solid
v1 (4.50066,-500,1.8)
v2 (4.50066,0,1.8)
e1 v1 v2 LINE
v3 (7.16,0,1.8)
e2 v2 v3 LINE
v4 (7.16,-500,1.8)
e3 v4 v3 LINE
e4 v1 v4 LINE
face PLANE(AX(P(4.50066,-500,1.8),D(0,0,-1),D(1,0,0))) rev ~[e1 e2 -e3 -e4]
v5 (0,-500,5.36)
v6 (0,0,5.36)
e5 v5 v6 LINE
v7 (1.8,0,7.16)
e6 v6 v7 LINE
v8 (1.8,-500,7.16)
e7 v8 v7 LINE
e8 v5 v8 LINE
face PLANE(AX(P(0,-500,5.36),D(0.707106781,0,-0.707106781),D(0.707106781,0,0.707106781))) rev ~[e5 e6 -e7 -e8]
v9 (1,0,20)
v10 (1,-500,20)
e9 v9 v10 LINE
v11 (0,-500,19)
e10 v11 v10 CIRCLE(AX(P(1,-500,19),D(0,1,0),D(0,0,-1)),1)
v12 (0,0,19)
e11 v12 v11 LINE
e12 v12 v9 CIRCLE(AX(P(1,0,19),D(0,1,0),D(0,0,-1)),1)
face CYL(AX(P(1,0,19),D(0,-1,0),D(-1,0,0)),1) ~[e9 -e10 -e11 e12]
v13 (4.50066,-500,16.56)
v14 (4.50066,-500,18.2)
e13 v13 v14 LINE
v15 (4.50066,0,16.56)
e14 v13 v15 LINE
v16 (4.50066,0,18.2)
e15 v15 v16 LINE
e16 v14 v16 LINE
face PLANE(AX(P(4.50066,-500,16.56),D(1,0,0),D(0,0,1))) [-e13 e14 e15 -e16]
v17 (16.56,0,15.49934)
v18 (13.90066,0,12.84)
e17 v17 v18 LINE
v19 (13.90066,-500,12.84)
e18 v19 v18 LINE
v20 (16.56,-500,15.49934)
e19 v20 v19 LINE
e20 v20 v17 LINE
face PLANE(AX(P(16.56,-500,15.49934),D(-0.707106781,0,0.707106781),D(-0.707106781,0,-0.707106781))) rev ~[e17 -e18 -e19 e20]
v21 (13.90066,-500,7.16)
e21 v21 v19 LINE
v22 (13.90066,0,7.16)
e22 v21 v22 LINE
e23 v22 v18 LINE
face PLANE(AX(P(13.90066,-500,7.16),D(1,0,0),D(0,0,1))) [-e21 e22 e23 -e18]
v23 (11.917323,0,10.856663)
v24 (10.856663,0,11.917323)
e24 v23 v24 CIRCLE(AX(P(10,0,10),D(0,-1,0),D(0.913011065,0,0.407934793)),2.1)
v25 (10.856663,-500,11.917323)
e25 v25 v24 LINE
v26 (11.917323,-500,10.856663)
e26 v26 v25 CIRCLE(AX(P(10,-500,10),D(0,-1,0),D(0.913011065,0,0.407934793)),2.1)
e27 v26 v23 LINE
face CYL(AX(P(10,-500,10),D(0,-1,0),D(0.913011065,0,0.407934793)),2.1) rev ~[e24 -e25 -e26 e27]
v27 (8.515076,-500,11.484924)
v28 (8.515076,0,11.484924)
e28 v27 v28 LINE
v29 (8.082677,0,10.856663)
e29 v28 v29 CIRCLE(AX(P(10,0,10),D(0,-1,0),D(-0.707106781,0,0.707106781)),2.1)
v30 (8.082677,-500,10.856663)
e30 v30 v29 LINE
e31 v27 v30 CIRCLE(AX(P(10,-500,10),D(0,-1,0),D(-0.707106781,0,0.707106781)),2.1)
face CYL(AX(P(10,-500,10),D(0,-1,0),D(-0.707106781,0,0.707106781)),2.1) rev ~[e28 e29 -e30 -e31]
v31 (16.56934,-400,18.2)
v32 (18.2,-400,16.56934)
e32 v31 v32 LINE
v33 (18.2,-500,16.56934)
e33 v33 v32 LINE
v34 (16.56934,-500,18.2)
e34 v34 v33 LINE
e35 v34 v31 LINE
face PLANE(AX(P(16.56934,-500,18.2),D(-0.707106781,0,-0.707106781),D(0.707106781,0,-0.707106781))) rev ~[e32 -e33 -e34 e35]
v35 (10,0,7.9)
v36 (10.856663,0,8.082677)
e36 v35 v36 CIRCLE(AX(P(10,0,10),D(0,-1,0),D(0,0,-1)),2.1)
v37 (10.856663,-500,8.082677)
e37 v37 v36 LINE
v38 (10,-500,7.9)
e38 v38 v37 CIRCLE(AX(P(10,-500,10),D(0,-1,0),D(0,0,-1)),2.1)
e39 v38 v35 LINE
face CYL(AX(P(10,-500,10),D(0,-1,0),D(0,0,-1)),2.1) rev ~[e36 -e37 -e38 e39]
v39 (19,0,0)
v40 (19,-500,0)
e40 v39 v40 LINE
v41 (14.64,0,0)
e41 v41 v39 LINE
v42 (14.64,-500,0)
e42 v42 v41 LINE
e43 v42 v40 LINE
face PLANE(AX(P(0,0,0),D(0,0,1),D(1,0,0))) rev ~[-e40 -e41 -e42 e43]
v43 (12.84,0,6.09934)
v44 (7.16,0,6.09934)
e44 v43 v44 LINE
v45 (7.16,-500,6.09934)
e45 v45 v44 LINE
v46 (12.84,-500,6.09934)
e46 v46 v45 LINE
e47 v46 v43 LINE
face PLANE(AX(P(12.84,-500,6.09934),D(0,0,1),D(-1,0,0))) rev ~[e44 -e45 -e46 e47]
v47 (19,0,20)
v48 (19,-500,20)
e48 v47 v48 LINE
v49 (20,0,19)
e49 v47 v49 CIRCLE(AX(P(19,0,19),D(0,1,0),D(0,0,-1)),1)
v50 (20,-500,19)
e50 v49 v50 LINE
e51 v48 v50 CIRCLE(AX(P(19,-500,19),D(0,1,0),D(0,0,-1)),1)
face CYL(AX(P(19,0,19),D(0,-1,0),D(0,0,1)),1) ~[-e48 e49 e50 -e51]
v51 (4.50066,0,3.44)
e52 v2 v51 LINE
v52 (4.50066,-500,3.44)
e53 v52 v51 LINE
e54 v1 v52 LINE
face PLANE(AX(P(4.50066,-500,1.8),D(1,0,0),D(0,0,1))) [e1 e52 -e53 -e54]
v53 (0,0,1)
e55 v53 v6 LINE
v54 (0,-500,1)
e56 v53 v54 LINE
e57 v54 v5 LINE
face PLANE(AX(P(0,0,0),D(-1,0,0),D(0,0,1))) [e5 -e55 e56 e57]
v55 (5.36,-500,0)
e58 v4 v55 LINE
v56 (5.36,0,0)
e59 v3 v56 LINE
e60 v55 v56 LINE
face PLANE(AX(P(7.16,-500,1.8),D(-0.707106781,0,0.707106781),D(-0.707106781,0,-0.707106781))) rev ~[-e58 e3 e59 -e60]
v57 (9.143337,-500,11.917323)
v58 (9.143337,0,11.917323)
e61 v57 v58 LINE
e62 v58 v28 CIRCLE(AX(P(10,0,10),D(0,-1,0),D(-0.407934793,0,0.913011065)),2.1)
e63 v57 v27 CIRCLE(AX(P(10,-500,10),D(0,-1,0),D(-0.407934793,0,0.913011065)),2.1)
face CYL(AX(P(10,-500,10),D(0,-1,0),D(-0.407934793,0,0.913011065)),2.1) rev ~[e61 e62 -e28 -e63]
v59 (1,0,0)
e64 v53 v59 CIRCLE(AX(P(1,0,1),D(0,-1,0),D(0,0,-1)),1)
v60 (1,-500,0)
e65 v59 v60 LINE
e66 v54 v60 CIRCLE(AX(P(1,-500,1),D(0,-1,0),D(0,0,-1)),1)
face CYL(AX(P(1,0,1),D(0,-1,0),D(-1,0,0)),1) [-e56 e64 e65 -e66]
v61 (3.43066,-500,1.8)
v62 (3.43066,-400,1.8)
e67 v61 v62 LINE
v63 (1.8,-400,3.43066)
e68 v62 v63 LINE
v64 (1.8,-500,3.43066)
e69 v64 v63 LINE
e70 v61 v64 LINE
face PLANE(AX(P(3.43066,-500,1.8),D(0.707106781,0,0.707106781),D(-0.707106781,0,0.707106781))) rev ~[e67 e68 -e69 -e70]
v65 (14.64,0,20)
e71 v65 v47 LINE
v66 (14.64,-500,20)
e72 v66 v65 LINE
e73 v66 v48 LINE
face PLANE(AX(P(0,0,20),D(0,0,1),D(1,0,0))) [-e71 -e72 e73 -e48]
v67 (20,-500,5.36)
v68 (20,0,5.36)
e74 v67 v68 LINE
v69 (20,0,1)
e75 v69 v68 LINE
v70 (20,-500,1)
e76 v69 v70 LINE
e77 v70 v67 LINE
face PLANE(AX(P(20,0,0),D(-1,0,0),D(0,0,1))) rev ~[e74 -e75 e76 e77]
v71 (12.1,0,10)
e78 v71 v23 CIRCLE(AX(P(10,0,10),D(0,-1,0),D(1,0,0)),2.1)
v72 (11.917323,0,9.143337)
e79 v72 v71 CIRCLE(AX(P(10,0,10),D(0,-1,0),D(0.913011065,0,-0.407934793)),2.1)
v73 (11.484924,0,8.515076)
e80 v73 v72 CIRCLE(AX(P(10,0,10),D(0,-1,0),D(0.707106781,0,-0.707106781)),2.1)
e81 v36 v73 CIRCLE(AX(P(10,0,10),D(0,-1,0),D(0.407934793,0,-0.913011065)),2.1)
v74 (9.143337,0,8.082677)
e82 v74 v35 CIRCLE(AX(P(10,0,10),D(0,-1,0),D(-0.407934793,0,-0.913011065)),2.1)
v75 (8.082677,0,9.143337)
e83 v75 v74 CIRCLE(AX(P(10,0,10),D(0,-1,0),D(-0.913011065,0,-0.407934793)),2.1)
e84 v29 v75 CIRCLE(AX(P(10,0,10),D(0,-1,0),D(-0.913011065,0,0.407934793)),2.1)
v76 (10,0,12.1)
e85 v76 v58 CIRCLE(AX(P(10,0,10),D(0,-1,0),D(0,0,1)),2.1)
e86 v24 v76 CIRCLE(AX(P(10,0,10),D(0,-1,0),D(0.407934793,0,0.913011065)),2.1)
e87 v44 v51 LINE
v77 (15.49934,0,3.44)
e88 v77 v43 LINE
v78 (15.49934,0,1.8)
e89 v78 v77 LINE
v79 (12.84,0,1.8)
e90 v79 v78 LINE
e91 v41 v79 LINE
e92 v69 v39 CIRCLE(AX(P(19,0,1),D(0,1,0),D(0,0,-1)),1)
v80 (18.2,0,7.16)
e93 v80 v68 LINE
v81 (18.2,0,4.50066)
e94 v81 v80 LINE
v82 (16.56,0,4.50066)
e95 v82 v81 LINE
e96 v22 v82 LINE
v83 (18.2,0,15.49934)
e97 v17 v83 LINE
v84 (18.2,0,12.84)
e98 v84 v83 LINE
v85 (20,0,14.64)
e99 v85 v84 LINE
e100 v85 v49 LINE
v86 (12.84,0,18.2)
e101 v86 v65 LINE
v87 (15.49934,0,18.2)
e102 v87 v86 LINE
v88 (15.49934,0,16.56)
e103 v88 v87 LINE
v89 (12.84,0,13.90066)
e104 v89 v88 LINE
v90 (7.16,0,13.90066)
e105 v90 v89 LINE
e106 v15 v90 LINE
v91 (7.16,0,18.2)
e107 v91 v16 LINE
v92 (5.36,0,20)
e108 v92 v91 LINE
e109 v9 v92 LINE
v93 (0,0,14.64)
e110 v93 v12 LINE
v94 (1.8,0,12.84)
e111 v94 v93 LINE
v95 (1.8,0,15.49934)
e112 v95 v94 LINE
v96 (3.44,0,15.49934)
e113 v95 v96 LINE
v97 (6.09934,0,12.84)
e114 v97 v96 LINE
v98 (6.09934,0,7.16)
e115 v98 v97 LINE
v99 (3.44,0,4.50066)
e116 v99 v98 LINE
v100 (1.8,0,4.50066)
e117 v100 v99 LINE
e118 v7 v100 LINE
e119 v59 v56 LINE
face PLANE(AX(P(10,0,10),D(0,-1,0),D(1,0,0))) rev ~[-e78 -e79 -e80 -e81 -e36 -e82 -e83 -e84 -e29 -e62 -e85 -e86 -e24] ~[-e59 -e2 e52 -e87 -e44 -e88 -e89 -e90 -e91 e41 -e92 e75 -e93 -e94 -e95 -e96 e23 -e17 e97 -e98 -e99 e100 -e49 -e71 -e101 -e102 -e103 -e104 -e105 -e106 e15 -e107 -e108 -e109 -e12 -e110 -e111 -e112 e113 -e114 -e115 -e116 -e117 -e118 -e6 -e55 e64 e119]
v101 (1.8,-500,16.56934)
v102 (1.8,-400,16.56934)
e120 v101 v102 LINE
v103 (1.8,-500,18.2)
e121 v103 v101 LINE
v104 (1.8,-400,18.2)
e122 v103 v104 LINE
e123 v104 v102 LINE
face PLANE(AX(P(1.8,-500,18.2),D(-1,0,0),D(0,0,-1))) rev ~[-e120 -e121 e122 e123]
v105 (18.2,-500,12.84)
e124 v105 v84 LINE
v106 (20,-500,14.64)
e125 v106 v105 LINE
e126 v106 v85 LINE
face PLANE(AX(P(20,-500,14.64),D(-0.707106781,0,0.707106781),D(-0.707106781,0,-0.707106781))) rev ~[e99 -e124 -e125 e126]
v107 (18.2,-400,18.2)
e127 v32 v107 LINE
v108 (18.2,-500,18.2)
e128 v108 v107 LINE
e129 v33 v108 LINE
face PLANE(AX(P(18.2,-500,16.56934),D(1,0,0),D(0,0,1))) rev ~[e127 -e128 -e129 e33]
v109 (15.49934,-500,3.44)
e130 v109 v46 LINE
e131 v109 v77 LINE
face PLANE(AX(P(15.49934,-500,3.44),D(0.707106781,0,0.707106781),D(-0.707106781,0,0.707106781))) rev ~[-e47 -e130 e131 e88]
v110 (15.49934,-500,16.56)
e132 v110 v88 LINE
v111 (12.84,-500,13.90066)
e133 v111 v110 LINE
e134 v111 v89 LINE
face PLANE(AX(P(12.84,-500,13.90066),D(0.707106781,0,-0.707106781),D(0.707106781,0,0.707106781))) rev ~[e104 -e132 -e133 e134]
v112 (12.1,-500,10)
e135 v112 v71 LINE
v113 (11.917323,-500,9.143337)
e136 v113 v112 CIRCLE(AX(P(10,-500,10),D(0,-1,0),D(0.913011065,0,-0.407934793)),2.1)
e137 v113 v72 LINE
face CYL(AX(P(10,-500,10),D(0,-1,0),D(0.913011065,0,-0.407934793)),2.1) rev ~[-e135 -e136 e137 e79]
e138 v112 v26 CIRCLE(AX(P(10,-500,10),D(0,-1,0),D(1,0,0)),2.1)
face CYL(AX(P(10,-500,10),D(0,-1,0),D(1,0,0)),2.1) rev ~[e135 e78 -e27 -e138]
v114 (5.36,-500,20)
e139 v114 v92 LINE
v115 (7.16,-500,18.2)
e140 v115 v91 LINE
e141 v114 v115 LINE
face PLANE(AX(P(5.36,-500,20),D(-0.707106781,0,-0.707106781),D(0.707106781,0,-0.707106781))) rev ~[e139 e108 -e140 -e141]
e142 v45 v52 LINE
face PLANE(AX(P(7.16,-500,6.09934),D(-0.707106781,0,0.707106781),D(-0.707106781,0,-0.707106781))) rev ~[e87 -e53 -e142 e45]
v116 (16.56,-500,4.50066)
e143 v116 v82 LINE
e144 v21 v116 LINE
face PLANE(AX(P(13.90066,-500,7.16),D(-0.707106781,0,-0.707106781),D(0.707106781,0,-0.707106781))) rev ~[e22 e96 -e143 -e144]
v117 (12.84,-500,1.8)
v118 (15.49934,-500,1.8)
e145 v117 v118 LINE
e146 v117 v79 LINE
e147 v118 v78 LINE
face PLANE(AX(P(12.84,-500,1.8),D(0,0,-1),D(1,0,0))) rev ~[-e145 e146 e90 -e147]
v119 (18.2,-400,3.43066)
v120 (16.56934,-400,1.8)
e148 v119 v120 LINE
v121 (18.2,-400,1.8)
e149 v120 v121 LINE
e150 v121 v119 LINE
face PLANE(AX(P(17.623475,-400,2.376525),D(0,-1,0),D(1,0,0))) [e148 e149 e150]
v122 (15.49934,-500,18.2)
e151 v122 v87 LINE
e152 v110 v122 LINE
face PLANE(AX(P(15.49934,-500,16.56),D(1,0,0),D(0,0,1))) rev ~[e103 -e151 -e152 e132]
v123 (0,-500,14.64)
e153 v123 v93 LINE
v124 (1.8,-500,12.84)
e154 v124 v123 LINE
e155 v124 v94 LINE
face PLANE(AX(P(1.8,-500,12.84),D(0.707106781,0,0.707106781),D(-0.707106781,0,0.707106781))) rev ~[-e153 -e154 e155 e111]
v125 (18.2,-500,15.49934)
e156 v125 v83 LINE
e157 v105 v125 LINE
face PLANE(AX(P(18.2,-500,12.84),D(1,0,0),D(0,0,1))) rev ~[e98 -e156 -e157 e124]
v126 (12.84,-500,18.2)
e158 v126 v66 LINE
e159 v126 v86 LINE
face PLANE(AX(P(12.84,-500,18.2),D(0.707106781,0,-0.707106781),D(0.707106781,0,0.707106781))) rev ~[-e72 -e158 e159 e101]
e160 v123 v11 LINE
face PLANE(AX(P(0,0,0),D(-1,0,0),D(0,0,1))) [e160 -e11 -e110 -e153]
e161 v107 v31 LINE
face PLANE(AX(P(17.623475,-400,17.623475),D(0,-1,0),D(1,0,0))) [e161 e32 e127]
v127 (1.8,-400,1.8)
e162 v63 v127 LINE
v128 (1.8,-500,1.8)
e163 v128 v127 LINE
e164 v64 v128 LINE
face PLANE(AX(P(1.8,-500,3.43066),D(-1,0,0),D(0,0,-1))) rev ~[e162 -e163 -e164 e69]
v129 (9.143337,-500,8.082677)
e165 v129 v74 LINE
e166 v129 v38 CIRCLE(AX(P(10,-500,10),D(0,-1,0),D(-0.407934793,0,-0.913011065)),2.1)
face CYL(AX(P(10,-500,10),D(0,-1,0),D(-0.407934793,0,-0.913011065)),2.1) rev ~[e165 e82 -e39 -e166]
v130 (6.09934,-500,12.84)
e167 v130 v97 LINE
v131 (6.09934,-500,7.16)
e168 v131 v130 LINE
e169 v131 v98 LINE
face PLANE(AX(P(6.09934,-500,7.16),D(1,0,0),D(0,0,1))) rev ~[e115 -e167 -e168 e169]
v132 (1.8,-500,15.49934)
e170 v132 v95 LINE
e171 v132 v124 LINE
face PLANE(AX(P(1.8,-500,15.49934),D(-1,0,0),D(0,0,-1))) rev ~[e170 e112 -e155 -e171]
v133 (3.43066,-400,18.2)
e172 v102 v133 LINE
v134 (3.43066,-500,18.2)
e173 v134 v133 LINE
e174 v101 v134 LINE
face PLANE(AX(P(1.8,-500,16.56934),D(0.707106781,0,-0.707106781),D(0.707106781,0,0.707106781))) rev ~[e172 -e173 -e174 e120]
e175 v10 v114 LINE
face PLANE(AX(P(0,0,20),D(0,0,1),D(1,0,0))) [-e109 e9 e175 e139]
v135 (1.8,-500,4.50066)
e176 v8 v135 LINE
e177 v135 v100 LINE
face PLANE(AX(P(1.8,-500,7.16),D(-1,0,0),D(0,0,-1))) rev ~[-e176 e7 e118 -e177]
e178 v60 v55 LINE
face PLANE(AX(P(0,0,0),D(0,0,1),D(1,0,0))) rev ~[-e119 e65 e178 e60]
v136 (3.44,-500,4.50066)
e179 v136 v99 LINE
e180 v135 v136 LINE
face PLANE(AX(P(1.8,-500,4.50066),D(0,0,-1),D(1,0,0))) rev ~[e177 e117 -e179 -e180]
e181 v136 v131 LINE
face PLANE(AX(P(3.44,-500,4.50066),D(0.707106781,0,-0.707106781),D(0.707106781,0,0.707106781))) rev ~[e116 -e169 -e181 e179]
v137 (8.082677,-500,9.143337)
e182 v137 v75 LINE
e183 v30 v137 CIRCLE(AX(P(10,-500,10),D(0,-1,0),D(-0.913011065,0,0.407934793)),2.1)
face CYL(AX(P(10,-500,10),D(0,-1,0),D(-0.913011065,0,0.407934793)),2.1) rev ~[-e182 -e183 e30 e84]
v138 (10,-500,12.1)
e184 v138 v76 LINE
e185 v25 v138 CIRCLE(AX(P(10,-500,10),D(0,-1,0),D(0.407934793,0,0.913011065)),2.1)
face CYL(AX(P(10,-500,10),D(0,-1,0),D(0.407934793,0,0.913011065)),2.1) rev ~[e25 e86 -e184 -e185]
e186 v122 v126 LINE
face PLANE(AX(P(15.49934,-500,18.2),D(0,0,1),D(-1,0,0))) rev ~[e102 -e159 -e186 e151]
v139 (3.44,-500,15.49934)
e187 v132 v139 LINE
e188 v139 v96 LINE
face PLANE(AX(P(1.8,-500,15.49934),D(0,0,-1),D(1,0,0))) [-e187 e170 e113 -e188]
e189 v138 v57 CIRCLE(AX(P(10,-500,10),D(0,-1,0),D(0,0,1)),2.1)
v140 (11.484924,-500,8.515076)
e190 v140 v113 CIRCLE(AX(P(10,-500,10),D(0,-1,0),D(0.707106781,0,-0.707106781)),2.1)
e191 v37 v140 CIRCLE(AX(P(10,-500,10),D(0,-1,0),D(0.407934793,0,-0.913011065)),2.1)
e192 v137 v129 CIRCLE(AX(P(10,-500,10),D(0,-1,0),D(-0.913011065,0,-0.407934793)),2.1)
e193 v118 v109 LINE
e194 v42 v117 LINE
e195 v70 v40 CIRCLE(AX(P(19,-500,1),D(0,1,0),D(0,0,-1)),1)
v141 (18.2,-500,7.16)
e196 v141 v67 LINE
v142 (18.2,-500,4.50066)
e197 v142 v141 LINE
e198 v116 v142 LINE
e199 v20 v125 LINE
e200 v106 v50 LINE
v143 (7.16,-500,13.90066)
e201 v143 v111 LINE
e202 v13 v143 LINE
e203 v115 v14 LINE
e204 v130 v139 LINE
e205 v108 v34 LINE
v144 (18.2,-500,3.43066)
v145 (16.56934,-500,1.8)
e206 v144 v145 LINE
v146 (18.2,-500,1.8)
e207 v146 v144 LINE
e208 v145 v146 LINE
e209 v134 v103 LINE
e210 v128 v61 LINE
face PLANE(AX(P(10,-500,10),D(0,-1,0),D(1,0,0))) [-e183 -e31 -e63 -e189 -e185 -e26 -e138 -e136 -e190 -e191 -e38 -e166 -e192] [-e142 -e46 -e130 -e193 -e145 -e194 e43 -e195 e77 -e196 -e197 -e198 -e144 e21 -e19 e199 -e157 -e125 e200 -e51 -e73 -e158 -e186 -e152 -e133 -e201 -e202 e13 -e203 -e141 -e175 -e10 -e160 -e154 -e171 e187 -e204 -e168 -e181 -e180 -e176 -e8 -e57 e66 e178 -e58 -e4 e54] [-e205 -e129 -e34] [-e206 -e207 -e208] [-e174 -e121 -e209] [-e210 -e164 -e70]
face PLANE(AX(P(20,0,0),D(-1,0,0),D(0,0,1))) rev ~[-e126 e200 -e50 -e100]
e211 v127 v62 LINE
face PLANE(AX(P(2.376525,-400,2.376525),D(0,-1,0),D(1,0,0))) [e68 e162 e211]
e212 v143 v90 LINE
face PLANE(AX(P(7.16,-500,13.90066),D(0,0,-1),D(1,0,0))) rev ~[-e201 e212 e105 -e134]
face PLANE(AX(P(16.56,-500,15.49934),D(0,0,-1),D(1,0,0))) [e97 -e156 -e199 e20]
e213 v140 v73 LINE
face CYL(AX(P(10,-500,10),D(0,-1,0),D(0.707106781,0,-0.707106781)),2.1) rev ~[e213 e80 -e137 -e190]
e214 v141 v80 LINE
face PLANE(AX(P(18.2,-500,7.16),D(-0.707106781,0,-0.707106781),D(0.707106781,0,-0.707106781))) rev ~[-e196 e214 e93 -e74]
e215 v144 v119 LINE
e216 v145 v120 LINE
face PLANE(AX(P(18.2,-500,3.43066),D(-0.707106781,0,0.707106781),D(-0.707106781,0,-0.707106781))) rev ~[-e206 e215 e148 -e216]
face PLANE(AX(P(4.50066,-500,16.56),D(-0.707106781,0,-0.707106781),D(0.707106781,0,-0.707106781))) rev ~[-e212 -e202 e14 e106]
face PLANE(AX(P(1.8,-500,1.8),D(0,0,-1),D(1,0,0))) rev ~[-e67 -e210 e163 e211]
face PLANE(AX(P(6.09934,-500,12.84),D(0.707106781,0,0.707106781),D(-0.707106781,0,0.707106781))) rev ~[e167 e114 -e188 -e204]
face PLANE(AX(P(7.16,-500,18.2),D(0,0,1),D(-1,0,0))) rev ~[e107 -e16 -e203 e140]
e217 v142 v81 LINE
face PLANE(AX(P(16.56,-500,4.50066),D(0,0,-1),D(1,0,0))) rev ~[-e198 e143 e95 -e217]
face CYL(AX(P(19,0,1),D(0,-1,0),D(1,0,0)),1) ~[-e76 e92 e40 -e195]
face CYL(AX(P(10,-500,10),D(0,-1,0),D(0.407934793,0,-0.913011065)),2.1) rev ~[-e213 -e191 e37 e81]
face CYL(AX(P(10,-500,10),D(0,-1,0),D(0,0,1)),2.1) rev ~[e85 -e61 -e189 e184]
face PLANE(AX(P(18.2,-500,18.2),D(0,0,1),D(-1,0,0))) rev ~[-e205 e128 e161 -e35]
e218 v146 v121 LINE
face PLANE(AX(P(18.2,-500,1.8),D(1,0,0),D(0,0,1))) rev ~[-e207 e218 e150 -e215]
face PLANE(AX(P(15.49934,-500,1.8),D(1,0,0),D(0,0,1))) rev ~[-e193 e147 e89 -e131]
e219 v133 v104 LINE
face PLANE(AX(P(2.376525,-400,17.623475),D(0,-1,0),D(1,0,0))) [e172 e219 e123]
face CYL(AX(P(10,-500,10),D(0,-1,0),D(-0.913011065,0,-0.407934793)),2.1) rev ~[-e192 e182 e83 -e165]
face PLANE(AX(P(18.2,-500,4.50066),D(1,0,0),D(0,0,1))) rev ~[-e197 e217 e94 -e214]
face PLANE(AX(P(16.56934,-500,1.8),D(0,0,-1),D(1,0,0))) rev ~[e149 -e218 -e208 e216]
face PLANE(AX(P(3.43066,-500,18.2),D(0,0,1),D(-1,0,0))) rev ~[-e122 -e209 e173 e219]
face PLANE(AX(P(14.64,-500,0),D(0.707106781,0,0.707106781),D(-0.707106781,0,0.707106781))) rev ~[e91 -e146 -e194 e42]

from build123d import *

# Parameters (mm, degrees)
F0_W     = 20
F0_H     = 20
F1_DEPTH = 500
F2_W     = 2.6593398282
F2_H     = 5.68
F2_W_2   = 2.84
F2_H_2   = 2.6593398282
F2_W_3   = 1.64
F2_H_3   = 1.64
F2_H_4   = 1.8
F3_DEPTH = 1000
F5_DEPTH = 100
F6_R     = 1


with BuildPart() as f1:
    # F0 (on Front) → F1 (new body)
    with BuildSketch(Plane.XZ):
        with Locations((10, 10)):
            Rectangle(F0_W, F0_H)
    extrude(amount=F1_DEPTH)

    # F2 (on face) → F3 (cut)
    with BuildSketch(Plane.XZ.offset(500)):
        with BuildLine():
            ThreePointArc((11.9173232366, 9.1433369352), (12.0538231176, 9.5620381277), (12.1, 10))
            ThreePointArc((12.1, 10), (12.0538231176, 10.4379618723), (11.9173232366, 10.8566630648))
            Line((11.9173232366, 10.8566630648), (11.0606601718, 10))
            Line((11.0606601718, 10), (11.9173232366, 9.1433369352))
        make_face()
        with BuildLine():
            Line((11.0606601718, 10), (11.9173232366, 10.8566630648))
            ThreePointArc((11.9173232366, 10.8566630648), (11.4849242405, 11.4849242405), (10.8566630648, 11.9173232366))
            Line((10.8566630648, 11.9173232366), (10, 11.0606601718))
            Line((10, 11.0606601718), (11.0606601718, 10))
        make_face()
        with BuildLine():
            ThreePointArc((11.4849242405, 8.5150757595), (11.7298843892, 8.80941191), (11.9173232366, 9.1433369352))
            Line((11.9173232366, 9.1433369352), (11.0606601718, 10))
            Line((11.0606601718, 10), (10.5303300859, 9.4696699141))
            Line((10.5303300859, 9.4696699141), (11.4849242405, 8.5150757595))
        make_face()
        with BuildLine():
            Line((10, 11.0606601718), (10.8566630648, 11.9173232366))
            ThreePointArc((10.8566630648, 11.9173232366), (10.4379618723, 12.0538231176), (10, 12.1))
            Line((10, 12.1), (10, 11.0606601718))
        make_face()
        Polygon((16.56, 15.4993398282), (13.9006601718, 12.84), (16.56, 12.84), align=None)
        with Locations((15.2303300859, 10)):
            Rectangle(F2_W, F2_H)
        Polygon((10.5303300859, 9.4696699141), (11.0606601718, 10), (10, 11.0606601718), (10, 10), align=None)
        with BuildLine():
            ThreePointArc((10.8566630648, 8.0826767634), (11.19058809, 8.2701156108), (11.4849242405, 8.5150757595))
            Line((11.4849242405, 8.5150757595), (10.5303300859, 9.4696699141))
            Line((10.5303300859, 9.4696699141), (10, 8.9393398282))
            Line((10, 8.9393398282), (10.8566630648, 8.0826767634))
        make_face()
        Polygon((16.56, 7.16), (13.9006601718, 7.16), (16.56, 4.5006601718), align=None)
        with BuildLine():
            Line((10, 11.0606601718), (10, 12.1))
            ThreePointArc((10, 12.1), (9.5620381277, 12.0538231176), (9.1433369352, 11.9173232366))
            Line((9.1433369352, 11.9173232366), (10, 11.0606601718))
        make_face()
        with BuildLine():
            Line((9.4696699141, 10.5303300859), (10, 11.0606601718))
            Line((10, 11.0606601718), (9.1433369352, 11.9173232366))
            ThreePointArc((9.1433369352, 11.9173232366), (8.80941191, 11.7298843892), (8.5150757595, 11.4849242405))
            Line((8.5150757595, 11.4849242405), (9.4696699141, 10.5303300859))
        make_face()
        Polygon((10, 10), (10, 11.0606601718), (9.4696699141, 10.5303300859), align=None)
        Polygon((12.84, 16.56), (12.84, 13.9006601718), (15.4993398282, 16.56), align=None)
        with Locations((11.42, 15.2303300859)):
            Rectangle(F2_W_2, F2_H_2)
        with Locations((17.38, 14.1696699141)):
            Rectangle(F2_W_3, F2_H_2)
        with Locations((17.38, 10)):
            Rectangle(F2_W_3, F2_H)
        Polygon((10, 8.9393398282), (10.5303300859, 9.4696699141), (10, 10), align=None)
        with BuildLine():
            ThreePointArc((10, 7.9), (10.4379618723, 7.9461768824), (10.8566630648, 8.0826767634))
            Line((10.8566630648, 8.0826767634), (10, 8.9393398282))
            Line((10, 8.9393398282), (10, 7.9))
        make_face()
        with Locations((17.38, 5.8303300859)):
            Rectangle(F2_W_3, F2_H_2)
        with Locations((8.58, 15.2303300859)):
            Rectangle(F2_W_2, F2_H_2)
        Polygon((10, 10), (9.4696699141, 10.5303300859), (8.9393398282, 10), (10, 8.9393398282), align=None)
        with BuildLine():
            Line((8.9393398282, 10), (9.4696699141, 10.5303300859))
            Line((9.4696699141, 10.5303300859), (8.5150757595, 11.4849242405))
            ThreePointArc((8.5150757595, 11.4849242405), (8.2701156108, 11.19058809), (8.0826767634, 10.8566630648))
            Line((8.0826767634, 10.8566630648), (8.9393398282, 10))
        make_face()
        with Locations((14.1696699141, 17.38)):
            Rectangle(F2_W, F2_H_3)
        with Locations((11.42, 17.38)):
            Rectangle(F2_W_2, F2_H_3)
        Polygon((20, 12.84), (18.2, 12.84), (18.2, 7.16), (20, 7.16), (20, 10), align=None)
        Polygon((20, 14.64), (18.2, 12.84), (20, 12.84), align=None)
        with BuildLine():
            Line((9.1433369352, 8.0826767634), (10, 8.9393398282))
            Line((10, 8.9393398282), (8.9393398282, 10))
            Line((8.9393398282, 10), (8.0826767634, 9.1433369352))
            ThreePointArc((8.0826767634, 9.1433369352), (8.5150757595, 8.5150757595), (9.1433369352, 8.0826767634))
        make_face()
        with BuildLine():
            Line((10, 7.9), (10, 8.9393398282))
            Line((10, 8.9393398282), (9.1433369352, 8.0826767634))
            ThreePointArc((9.1433369352, 8.0826767634), (9.5620381277, 7.9461768824), (10, 7.9))
        make_face()
        Polygon((15.4993398282, 3.44), (12.84, 6.0993398282), (12.84, 3.44), align=None)
        with Locations((11.42, 4.7696699141)):
            Rectangle(F2_W_2, F2_H_2)
        Polygon((20, 7.16), (18.2, 7.16), (20, 5.36), align=None)
        Polygon((4.5006601718, 16.56), (7.16, 13.9006601718), (7.16, 16.56), align=None)
        with Locations((8.58, 17.38)):
            Rectangle(F2_W_2, F2_H_3)
        with BuildLine():
            Line((8.0826767634, 9.1433369352), (8.9393398282, 10))
            Line((8.9393398282, 10), (8.0826767634, 10.8566630648))
            ThreePointArc((8.0826767634, 10.8566630648), (7.9, 10), (8.0826767634, 9.1433369352))
        make_face()
        Polygon((12.84, 20), (12.84, 18.2), (14.64, 20), align=None)
        with Locations((11.42, 19.1)):
            Rectangle(F2_W_2, F2_H_4)
        with Locations((8.58, 4.7696699141)):
            Rectangle(F2_W_2, F2_H_2)
        with Locations((14.1696699141, 2.62)):
            Rectangle(F2_W, F2_H_3)
        with Locations((11.42, 2.62)):
            Rectangle(F2_W_2, F2_H_3)
        with Locations((5.8303300859, 17.38)):
            Rectangle(F2_W, F2_H_3)
        with Locations((8.58, 19.1)):
            Rectangle(F2_W_2, F2_H_4)
        Polygon((7.16, 3.44), (7.16, 6.0993398282), (4.5006601718, 3.44), align=None)
        with Locations((8.58, 2.62)):
            Rectangle(F2_W_2, F2_H_3)
        with Locations((11.42, 0.9)):
            Rectangle(F2_W_2, F2_H_4)
        Polygon((14.64, 0), (12.84, 1.8), (12.84, 0), align=None)
        Polygon((3.44, 12.84), (6.0993398282, 12.84), (3.44, 15.4993398282), align=None)
        with Locations((4.7696699141, 10)):
            Rectangle(F2_W, F2_H)
        Polygon((5.36, 20), (7.16, 18.2), (7.16, 20), align=None)
        Polygon((3.44, 4.5006601718), (6.0993398282, 7.16), (3.44, 7.16), align=None)
        with Locations((5.8303300859, 2.62)):
            Rectangle(F2_W, F2_H_3)
        with Locations((8.58, 0.9)):
            Rectangle(F2_W_2, F2_H_4)
        with Locations((2.62, 14.1696699141)):
            Rectangle(F2_W_3, F2_H_2)
        with Locations((2.62, 10)):
            Rectangle(F2_W_3, F2_H)
        with Locations((2.62, 5.8303300859)):
            Rectangle(F2_W_3, F2_H_2)
        Polygon((7.16, 0), (7.16, 1.8), (5.36, 0), align=None)
        Polygon((0, 12.84), (1.8, 12.84), (0, 14.64), align=None)
        Polygon((1.8, 7.16), (1.8, 12.84), (0, 12.84), (0, 10), (0, 7.16), align=None)
        Polygon((0, 5.36), (1.8, 7.16), (0, 7.16), align=None)
    extrude(amount=-F3_DEPTH, mode=Mode.SUBTRACT)

    # F4 (on face) → F5 (cut)
    with BuildSketch(Plane.XZ.offset(500)):
        Polygon((3.4306601718, 1.8), (1.8, 3.4306601718), (1.8, 1.8), align=None)
        Polygon((1.8, 18.2), (1.8, 16.5693398282), (3.4306601718, 18.2), align=None)
        Polygon((18.2, 18.2), (16.5693398282, 18.2), (18.2, 16.5693398282), align=None)
        Polygon((18.2, 3.4306601718), (16.5693398282, 1.8), (18.2, 1.8), align=None)
    extrude(amount=-F5_DEPTH, mode=Mode.SUBTRACT)

    # F6
    f6_edges = [f1.edges().sort_by_distance(p)[0] for p in [
        (20, -250, 20),
        (20, -250, 0),
        (0, -250, 20),
        (0, -250, 0),
    ]]
    fillet(f6_edges, radius=F6_R)


solid = f1.part
